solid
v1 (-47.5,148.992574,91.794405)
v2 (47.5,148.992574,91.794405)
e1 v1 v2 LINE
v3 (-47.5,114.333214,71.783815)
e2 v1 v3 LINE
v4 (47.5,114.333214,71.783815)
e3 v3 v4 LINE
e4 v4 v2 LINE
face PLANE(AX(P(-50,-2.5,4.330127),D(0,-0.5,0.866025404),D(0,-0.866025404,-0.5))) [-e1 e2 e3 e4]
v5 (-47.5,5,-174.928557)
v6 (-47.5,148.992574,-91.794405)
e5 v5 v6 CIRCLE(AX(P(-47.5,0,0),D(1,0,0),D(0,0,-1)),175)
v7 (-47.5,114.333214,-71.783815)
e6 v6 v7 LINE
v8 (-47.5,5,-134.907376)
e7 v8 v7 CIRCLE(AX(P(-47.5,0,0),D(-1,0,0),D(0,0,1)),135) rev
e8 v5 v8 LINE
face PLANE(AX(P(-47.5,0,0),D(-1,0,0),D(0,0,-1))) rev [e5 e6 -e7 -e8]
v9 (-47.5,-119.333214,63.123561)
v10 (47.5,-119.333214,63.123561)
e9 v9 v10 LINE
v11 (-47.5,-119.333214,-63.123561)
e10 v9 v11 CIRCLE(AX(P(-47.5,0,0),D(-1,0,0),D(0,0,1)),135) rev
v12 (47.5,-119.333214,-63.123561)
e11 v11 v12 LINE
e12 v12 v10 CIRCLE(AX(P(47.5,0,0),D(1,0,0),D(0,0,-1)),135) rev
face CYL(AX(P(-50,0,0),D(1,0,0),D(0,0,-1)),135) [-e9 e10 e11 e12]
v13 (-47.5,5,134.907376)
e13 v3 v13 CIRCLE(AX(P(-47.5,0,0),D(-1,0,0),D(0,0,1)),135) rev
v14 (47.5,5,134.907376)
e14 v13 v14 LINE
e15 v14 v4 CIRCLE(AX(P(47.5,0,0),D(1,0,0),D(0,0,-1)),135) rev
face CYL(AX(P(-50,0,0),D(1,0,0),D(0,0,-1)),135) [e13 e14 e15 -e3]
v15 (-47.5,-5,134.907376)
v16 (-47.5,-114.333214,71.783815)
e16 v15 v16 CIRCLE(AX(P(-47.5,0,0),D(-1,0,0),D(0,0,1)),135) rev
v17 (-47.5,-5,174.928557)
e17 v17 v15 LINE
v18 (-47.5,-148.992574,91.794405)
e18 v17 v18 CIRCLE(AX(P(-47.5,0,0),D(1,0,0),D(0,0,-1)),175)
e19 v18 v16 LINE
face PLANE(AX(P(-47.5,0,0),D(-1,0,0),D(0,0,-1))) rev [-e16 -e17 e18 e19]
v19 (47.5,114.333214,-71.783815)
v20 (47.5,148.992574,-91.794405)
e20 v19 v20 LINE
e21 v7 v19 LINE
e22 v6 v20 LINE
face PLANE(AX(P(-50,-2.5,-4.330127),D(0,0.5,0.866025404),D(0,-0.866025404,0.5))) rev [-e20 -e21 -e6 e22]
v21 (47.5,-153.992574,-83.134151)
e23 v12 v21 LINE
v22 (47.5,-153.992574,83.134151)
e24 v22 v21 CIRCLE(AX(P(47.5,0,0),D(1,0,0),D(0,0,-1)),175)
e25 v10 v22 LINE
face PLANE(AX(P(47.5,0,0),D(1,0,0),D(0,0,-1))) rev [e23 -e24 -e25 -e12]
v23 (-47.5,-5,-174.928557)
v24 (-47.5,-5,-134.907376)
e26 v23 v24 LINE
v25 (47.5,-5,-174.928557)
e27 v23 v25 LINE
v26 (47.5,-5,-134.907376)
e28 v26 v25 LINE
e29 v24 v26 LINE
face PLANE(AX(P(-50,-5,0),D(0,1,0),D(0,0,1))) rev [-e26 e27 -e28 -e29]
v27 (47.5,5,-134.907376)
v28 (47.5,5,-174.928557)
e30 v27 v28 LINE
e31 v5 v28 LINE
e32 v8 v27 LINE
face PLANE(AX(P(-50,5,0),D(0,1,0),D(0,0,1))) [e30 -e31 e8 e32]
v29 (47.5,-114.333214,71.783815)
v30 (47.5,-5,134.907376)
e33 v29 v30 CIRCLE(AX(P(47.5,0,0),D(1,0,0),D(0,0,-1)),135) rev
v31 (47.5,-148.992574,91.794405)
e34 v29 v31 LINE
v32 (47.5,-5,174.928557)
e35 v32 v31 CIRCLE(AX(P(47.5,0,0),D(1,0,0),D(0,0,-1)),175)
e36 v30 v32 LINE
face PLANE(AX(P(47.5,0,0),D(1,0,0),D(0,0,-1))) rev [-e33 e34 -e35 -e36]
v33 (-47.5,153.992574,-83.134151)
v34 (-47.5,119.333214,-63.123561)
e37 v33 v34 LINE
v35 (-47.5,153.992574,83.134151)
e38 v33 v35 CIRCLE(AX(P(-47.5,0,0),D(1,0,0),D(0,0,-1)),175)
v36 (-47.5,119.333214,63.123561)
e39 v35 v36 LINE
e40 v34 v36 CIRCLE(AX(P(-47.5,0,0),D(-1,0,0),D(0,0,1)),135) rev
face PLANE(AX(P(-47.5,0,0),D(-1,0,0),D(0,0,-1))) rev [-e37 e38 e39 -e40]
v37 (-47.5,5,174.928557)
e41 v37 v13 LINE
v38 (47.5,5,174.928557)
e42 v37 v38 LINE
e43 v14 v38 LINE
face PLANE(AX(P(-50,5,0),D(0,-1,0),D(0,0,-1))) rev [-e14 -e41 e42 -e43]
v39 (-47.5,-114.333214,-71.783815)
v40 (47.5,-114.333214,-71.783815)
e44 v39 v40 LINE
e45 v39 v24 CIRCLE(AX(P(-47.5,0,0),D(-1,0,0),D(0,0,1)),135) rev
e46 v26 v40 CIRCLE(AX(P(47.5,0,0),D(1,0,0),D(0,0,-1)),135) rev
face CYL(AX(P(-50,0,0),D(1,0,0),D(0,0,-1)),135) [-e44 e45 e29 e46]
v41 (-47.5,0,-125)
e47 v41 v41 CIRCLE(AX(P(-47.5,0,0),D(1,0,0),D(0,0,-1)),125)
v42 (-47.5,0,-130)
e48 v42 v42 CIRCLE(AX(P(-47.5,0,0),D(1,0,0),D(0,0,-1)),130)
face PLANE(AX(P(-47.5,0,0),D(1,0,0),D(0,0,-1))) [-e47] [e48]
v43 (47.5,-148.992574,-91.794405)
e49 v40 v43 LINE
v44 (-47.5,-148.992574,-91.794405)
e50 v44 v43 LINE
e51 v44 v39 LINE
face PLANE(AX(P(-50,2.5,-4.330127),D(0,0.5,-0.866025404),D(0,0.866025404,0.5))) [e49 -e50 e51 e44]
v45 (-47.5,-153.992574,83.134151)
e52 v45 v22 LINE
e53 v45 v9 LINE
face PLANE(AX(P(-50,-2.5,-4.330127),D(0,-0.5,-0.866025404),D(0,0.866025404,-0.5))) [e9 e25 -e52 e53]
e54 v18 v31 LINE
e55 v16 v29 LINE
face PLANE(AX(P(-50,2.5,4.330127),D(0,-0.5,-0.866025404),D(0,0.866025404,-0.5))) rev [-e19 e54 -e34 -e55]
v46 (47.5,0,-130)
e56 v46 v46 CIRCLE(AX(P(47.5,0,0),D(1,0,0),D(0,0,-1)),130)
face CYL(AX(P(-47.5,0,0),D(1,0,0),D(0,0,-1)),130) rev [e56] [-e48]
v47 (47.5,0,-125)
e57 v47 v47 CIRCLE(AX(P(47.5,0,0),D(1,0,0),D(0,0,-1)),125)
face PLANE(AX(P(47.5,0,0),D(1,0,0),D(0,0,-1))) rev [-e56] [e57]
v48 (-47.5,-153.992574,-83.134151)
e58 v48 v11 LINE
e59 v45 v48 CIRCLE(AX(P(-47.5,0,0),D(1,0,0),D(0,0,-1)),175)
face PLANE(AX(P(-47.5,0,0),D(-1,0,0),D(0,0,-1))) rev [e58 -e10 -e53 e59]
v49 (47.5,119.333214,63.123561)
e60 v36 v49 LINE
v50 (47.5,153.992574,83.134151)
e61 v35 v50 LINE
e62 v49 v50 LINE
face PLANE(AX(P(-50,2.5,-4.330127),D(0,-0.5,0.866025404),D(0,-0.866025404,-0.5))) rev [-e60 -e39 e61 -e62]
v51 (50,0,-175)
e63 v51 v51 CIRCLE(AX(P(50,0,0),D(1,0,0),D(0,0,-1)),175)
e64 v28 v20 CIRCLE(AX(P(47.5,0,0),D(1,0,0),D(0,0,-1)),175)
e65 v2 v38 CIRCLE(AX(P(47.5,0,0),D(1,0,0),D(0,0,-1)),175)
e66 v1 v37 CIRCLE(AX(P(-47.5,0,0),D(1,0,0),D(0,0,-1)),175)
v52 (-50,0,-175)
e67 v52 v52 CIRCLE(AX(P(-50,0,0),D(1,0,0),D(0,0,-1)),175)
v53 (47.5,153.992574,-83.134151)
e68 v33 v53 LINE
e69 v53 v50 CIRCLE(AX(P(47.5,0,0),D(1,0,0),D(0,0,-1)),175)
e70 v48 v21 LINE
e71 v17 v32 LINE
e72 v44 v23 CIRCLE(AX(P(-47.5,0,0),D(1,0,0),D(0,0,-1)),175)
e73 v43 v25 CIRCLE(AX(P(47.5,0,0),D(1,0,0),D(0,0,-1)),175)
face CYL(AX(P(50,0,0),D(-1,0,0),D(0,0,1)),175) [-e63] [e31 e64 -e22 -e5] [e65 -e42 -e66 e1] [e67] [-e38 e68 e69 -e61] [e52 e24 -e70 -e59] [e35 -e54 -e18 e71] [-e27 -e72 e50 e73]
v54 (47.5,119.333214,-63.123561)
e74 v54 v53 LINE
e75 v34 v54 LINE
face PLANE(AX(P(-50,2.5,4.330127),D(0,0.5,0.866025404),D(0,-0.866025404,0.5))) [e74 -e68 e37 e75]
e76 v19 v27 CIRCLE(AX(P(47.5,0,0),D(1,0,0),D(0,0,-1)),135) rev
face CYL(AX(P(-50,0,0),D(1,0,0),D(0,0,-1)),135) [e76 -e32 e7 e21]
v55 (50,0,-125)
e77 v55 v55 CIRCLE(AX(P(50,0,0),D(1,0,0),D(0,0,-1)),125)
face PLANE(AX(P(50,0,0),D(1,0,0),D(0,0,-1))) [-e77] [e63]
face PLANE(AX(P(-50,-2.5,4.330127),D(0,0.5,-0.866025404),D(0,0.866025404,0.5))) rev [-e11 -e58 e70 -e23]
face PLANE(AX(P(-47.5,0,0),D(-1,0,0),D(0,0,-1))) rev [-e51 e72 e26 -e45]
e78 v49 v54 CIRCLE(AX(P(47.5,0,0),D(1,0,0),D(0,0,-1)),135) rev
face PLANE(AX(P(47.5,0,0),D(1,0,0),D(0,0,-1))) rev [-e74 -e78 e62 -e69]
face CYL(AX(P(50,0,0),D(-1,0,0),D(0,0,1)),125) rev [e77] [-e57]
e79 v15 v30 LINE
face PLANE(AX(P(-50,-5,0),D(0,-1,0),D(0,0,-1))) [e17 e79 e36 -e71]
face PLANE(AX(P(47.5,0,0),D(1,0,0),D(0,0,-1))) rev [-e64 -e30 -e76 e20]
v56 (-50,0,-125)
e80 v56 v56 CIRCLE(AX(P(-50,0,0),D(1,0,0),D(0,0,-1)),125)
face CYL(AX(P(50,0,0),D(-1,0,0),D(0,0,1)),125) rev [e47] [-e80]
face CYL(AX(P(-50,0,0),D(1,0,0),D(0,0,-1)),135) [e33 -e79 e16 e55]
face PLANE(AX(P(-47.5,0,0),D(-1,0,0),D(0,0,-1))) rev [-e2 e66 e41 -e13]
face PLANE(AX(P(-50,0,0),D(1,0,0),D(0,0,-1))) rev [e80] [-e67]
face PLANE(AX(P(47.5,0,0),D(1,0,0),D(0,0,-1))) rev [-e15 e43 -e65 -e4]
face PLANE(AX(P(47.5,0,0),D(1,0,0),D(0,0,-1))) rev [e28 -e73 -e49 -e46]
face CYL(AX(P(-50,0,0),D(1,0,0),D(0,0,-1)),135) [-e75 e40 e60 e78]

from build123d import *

# Parameters (mm, degrees)
SKETCH8_R               = 175
SKETCH8_R_2             = 125
BOSS_EXTRUDE7_DEPTH     = 50
SKETCH9_R               = 130
SKETCH9_R_2             = 125
CUT_EXTRUDE2_DEPTH      = 47.5
CUT_EXTRUDE3_DEPTH      = 267.926956301
CUT_EXTRUDE3_DEPTH_BACK = 267.926956301
SKETCH11_R              = 175
SKETCH11_R_2            = 125
BOSS_EXTRUDE8_DEPTH     = 2.5


with BuildPart() as part:
    # Sketch8 → Boss-Extrude7 (new, symmetric)
    with BuildSketch(Plane.YZ):
        Circle(SKETCH8_R)
        Circle(SKETCH8_R_2, mode=Mode.SUBTRACT)
    extrude(amount=BOSS_EXTRUDE7_DEPTH, both=True)

    # Sketch9 → Cut-Extrude2 (cut, symmetric)
    with BuildSketch(Plane.YZ):
        Circle(SKETCH9_R)
        Circle(SKETCH9_R_2, mode=Mode.SUBTRACT)
    extrude(amount=CUT_EXTRUDE2_DEPTH, both=True, mode=Mode.SUBTRACT)

    # Sketch10 → Cut-Extrude3 (cut, two sides: drawn at the far end of the back side and taken through both)
    with BuildSketch(Plane.YZ.offset(50).offset(-CUT_EXTRUDE3_DEPTH_BACK)):
        with BuildLine():
            Line((114.333214455, 71.783814835), (148.992574075, 91.794405442))
            ThreePointArc((148.992574075, 91.794405442), (87.5, 151.554445662), (5, 174.928556845))
            Line((5, 174.928556845), (5, 134.907375632))
            ThreePointArc((5, 134.907375632), (67.5, 116.913429511), (114.333214455, 71.783814835))
        make_face()
        with BuildLine():
            ThreePointArc((153.992574075, -83.134151404), (175, 0), (153.992574075, 83.134151404))
            Line((153.992574075, 83.134151404), (119.333214455, 63.123560797))
            ThreePointArc((119.333214455, 63.123560797), (135, 0), (119.333214455, -63.123560797))
            Line((119.333214455, -63.123560797), (153.992574075, -83.134151404))
        make_face()
        with BuildLine():
            ThreePointArc((-114.333214455, 71.783814835), (-67.5, 116.913429511), (-5, 134.907375632))
            Line((-5, 134.907375632), (-5, 174.928556845))
            ThreePointArc((-5, 174.928556845), (-87.5, 151.554445662), (-148.992574075, 91.794405442))
            Line((-148.992574075, 91.794405442), (-114.333214455, 71.783814835))
        make_face()
        with BuildLine():
            Line((148.992574075, -91.794405442), (114.333214455, -71.783814835))
            ThreePointArc((114.333214455, -71.783814835), (67.5, -116.913429511), (5, -134.907375632))
            Line((5, -134.907375632), (5, -174.928556845))
            ThreePointArc((5, -174.928556845), (87.5, -151.554445662), (148.992574075, -91.794405442))
        make_face()
        with BuildLine():
            ThreePointArc((-119.333214455, -63.123560797), (-135, 0), (-119.333214455, 63.123560797))
            Line((-119.333214455, 63.123560797), (-153.992574075, 83.134151404))
            ThreePointArc((-153.992574075, 83.134151404), (-175, 0), (-153.992574075, -83.134151404))
            Line((-153.992574075, -83.134151404), (-119.333214455, -63.123560797))
        make_face()
        with BuildLine():
            Line((-5, -174.928556845), (-5, -134.907375632))
            ThreePointArc((-5, -134.907375632), (-67.5, -116.913429511), (-114.333214455, -71.783814835))
            Line((-114.333214455, -71.783814835), (-148.992574075, -91.794405442))
            ThreePointArc((-148.992574075, -91.794405442), (-87.5, -151.554445662), (-5, -174.928556845))
        make_face()
    extrude(amount=CUT_EXTRUDE3_DEPTH + CUT_EXTRUDE3_DEPTH_BACK, mode=Mode.SUBTRACT)

    # Sketch11 → Boss-Extrude8 (add)
    with BuildSketch(Plane.YZ.offset(50)):
        Circle(SKETCH11_R)
        Circle(SKETCH11_R_2, mode=Mode.SUBTRACT)
    boss_extrude8 = extrude(amount=-BOSS_EXTRUDE8_DEPTH)

    # Mirror3: Boss-Extrude8 across plane
    add(boss_extrude8.mirror(Plane(origin=(0, 0, 0), x_dir=(0, 0, 1), z_dir=(1, 0, 0))))


solid = part.part
